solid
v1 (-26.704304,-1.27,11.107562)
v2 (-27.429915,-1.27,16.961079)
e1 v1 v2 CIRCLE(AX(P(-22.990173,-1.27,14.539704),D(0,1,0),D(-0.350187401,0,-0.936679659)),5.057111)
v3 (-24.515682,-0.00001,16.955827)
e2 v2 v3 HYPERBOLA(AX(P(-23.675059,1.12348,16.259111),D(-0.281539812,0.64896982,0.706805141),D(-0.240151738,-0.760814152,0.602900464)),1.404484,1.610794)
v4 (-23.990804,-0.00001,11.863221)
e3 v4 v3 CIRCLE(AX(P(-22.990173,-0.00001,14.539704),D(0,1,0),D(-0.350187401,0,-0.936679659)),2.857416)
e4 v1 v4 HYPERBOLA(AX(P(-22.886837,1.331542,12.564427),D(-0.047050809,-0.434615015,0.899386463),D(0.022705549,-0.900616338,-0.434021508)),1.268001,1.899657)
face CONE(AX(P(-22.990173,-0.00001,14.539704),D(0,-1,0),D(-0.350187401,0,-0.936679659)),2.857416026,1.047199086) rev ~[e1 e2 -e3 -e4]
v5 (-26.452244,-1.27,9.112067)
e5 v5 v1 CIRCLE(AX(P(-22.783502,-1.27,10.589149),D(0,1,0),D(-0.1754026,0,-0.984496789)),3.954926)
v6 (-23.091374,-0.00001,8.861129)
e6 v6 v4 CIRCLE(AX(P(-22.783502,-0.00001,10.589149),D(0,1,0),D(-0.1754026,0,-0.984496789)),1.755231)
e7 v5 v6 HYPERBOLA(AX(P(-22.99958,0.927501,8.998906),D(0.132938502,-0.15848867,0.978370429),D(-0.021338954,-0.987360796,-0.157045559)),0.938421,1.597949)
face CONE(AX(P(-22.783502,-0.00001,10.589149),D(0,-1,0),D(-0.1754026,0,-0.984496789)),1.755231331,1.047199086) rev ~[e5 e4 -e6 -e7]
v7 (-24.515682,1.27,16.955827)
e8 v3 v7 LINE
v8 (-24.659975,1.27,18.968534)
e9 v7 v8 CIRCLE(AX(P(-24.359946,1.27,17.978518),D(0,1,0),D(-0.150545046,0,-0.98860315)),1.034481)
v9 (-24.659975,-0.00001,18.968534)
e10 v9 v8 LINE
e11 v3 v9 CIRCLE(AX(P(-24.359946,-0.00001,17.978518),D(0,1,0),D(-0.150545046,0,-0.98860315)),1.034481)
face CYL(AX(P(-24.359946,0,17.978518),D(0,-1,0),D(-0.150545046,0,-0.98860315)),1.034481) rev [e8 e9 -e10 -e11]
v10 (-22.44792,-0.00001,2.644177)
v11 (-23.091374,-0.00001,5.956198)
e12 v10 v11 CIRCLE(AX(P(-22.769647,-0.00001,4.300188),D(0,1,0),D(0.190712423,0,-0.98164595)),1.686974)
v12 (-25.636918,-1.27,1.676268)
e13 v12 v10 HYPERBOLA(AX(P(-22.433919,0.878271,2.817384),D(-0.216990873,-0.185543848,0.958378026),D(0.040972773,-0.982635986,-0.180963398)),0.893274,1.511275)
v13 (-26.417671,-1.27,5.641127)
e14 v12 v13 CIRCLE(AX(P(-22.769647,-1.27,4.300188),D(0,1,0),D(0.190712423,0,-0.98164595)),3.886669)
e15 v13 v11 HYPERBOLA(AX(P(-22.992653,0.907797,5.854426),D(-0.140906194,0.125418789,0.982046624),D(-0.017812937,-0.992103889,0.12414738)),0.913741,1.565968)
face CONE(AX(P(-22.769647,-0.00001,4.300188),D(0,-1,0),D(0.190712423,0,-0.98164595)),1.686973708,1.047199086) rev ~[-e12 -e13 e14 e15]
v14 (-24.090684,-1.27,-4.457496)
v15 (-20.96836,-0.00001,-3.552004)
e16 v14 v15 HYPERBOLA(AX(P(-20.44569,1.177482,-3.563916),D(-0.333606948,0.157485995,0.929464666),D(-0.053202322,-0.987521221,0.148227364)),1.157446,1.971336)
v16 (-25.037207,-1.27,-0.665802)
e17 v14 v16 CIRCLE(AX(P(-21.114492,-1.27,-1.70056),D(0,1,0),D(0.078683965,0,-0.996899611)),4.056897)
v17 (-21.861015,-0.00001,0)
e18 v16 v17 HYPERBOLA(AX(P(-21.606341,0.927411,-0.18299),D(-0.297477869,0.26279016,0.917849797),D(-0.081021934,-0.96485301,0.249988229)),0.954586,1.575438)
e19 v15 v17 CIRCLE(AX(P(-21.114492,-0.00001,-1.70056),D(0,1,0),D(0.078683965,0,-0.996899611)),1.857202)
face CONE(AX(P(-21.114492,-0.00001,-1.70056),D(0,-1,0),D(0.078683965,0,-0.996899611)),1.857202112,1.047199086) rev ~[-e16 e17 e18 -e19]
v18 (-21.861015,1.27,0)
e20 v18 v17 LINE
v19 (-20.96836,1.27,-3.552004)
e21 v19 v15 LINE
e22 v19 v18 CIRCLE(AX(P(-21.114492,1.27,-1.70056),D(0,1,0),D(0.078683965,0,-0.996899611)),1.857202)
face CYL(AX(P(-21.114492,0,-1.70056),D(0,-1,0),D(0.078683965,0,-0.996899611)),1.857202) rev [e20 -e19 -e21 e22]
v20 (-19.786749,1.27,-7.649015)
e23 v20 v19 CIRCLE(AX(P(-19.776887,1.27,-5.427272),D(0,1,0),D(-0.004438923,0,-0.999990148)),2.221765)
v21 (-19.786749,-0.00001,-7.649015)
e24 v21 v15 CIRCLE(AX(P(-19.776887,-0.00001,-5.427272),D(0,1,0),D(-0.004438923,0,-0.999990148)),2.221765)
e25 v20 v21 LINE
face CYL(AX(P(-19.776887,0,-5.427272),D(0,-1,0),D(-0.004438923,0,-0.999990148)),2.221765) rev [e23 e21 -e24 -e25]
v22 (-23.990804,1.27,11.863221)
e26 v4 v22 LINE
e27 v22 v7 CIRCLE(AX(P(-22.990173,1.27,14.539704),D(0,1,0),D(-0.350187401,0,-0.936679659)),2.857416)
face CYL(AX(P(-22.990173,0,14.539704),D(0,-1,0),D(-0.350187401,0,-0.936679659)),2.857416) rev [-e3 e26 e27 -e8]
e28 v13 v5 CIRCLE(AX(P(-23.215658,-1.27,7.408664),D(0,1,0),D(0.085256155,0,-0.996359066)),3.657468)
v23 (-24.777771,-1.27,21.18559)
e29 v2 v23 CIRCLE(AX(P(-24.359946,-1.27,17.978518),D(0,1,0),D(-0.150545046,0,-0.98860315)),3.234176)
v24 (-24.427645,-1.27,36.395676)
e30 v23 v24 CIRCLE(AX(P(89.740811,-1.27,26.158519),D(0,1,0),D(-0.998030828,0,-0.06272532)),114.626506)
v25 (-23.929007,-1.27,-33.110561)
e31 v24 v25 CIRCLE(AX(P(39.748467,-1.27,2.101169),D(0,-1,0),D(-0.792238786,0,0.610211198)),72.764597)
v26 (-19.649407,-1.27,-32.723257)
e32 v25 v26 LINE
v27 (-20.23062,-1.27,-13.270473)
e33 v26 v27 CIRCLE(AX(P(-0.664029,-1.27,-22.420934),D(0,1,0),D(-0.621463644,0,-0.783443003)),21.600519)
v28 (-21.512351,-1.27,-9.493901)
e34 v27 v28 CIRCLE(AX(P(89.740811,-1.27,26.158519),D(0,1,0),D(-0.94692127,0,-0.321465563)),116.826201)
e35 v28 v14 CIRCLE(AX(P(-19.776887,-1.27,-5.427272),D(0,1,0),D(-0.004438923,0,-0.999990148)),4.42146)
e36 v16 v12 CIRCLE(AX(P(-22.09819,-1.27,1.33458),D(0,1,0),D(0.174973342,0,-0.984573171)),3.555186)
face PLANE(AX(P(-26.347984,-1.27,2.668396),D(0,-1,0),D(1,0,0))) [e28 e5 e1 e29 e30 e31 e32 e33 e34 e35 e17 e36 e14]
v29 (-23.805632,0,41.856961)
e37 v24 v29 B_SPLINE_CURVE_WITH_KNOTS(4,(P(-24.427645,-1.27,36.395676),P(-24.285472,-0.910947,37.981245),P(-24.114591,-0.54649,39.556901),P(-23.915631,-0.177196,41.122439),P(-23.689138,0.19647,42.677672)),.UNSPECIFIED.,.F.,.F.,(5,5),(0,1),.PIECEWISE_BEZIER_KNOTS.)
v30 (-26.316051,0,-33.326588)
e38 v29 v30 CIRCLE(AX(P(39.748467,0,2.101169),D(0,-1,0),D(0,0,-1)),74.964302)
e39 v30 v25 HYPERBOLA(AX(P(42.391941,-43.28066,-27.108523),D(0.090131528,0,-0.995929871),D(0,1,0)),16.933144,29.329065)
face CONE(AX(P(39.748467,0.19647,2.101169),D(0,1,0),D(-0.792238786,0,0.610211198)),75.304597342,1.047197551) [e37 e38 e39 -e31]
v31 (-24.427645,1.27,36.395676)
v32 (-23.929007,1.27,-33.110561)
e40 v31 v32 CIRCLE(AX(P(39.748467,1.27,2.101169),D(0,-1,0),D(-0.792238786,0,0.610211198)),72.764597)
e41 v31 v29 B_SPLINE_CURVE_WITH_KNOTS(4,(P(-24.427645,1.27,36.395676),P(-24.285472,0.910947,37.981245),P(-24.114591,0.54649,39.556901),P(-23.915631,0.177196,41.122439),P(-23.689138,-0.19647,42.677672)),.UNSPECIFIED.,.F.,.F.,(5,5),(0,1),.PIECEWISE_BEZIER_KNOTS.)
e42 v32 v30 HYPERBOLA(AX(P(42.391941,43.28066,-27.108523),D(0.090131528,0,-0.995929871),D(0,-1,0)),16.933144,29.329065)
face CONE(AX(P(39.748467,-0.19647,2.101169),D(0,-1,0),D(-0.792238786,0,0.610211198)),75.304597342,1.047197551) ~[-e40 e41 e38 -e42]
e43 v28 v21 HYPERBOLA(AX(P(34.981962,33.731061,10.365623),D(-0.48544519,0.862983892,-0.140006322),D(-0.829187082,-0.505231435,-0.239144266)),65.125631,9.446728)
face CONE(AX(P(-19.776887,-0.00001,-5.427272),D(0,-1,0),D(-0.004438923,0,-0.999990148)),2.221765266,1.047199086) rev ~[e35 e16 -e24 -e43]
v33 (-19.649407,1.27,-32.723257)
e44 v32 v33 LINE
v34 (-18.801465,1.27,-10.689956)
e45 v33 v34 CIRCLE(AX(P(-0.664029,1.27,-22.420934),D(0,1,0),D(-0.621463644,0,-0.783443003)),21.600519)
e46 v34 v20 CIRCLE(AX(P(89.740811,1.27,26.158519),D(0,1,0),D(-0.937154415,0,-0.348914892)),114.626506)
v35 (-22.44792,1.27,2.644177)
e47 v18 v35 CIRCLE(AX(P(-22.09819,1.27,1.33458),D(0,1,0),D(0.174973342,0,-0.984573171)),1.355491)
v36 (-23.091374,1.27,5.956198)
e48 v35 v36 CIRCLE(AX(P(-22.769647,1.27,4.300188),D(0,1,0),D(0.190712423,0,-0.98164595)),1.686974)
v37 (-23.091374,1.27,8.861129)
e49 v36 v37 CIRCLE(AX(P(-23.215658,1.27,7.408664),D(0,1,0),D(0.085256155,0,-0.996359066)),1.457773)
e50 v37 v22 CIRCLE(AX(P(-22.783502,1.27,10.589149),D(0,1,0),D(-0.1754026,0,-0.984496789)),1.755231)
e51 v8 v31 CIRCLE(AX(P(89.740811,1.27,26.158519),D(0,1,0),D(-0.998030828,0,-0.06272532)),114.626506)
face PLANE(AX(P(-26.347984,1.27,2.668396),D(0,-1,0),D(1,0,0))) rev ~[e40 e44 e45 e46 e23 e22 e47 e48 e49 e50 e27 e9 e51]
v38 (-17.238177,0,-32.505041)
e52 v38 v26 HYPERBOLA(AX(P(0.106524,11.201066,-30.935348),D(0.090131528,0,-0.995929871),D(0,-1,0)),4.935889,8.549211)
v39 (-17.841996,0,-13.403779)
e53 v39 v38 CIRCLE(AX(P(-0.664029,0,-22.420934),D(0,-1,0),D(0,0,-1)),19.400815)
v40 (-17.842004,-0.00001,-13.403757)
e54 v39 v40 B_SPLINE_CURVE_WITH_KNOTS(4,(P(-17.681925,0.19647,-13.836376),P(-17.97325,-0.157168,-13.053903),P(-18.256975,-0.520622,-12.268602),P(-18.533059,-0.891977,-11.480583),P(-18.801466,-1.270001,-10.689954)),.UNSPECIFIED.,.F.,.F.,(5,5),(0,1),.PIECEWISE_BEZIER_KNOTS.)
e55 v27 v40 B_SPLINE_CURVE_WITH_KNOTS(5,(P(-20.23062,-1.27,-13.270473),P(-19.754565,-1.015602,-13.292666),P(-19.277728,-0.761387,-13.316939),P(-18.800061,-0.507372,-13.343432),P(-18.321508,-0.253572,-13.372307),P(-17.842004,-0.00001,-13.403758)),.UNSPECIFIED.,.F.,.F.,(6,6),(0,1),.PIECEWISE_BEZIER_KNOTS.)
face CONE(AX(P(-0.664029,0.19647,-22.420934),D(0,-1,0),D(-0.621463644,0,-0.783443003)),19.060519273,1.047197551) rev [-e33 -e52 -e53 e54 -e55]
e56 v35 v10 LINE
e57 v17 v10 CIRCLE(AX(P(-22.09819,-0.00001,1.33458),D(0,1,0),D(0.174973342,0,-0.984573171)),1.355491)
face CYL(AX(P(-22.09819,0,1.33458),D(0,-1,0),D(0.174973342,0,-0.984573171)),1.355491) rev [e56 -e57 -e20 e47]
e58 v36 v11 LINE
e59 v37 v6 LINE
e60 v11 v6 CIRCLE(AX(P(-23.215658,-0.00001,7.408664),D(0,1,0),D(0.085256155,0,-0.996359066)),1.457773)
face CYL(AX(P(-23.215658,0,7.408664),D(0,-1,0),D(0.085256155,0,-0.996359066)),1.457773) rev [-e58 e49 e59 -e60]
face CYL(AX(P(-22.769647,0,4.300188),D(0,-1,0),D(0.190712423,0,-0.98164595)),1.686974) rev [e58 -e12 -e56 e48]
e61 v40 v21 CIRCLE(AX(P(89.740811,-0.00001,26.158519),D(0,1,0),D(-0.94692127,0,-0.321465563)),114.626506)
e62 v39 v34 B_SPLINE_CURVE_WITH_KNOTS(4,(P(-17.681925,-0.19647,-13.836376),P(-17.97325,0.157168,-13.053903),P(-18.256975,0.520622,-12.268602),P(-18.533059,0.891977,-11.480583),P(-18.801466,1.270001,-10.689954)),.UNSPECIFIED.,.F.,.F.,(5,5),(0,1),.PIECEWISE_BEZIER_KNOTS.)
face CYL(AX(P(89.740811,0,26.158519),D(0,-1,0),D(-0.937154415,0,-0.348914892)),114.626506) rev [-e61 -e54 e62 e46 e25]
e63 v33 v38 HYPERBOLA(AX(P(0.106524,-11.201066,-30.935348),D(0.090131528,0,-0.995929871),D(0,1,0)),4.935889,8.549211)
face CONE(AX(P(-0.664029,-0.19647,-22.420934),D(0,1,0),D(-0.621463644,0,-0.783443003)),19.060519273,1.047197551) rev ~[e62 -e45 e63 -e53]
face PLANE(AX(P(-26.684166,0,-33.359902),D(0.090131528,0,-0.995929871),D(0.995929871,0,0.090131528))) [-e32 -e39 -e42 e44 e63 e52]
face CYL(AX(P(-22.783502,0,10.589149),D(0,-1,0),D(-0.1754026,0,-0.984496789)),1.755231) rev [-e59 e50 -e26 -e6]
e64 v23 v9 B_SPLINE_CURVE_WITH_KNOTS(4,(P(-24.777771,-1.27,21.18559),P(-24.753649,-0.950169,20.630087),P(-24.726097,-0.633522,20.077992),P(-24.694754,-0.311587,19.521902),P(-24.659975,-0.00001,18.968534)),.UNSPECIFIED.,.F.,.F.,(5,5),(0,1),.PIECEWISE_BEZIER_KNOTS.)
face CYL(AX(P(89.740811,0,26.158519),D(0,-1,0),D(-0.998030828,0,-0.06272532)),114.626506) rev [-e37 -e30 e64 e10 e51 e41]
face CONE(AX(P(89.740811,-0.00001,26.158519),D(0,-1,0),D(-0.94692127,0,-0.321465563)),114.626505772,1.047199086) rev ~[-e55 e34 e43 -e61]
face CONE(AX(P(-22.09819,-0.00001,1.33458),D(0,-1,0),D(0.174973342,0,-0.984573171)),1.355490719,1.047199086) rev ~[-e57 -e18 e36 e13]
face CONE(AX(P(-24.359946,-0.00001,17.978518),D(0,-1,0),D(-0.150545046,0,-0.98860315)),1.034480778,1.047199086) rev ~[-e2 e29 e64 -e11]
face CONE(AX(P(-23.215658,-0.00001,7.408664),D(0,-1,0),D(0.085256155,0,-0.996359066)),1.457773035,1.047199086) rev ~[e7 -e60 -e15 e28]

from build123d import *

# Parameters (mm, degrees)
F1_DEPTH    = 1.27
F2_T2_ANGLE = 70.6982594797
F2_T4_ANGLE = 98.1015766654
F2_T6_ANGLE = 98.1015766654
F2_T8_ANGLE = 70.6982594797
F3_SIZE2    = 1.26999
F3_SIZE     = 2.199695


# Not quite as in the source:
# - a fillet or chamfer that OpenCascade refuses, or shapes differently, is made with other operations: its cross-section is extruded or revolved along the edge and cut away or added
# - a fillet or chamfer is up to 0.001 mm smaller than in the source, because OpenCascade refuses the exact size


with BuildPart() as f1:
    # F0 (on Front) → F1 (new body, symmetric)
    with BuildSketch(Plane.XZ):
        with BuildLine():
            ThreePointArc((-24.6599751414, 18.9685343092), (-24.7897166458, 30.8482925644), (-23.6891379404, 42.6776719046))
            ThreePointArc((-23.6891379404, 42.6776719046), (-35.4977812157, 5.0650277845), (-26.6841664691, -33.3599022584))
            Line((-26.6841664691, -33.3599022584), (-16.8598182499, -32.4707999825))
            ThreePointArc((-16.8598182499, -32.4707999825), (-19.7060260634, -23.2610213965), (-17.6819246262, -13.836376369))
            ThreePointArc((-17.6819246262, -13.836376369), (-18.7784432725, -10.7577001108), (-19.7867489636, -7.6490154569))
            ThreePointArc((-19.7867489636, -7.6490154569), (-21.9116415788, -6.0429526618), (-20.9683603212, -3.5520036866))
            ThreePointArc((-20.9683603212, -3.5520036866), (-22.9156863653, -2.1532182096), (-21.8610153861, 0))
            ThreePointArc((-21.8610153861, 0), (-23.4214756824, 1.0408615122), (-22.4479204638, 2.6441765967))
            ThreePointArc((-22.4479204638, 2.6441765967), (-24.4256582154, 3.9784606628), (-23.0913741493, 5.9561984144))
            ThreePointArc((-23.0913741493, 5.9561984144), (-24.6734313076, 7.4086637933), (-23.0913741493, 8.8611291721))
            ThreePointArc((-23.0913741493, 8.8611291721), (-24.4648932463, 10.085402282), (-23.9908037994, 11.8632207636))
            ThreePointArc((-23.9908037994, 11.8632207636), (-25.8325317785, 14.2467515683), (-24.515682055, 16.9558266598))
            ThreePointArc((-24.515682055, 16.9558266598), (-25.3917786695, 17.9045444751), (-24.6599751414, 18.9685343092))
        make_face()
    extrude(amount=F1_DEPTH, both=True)

    # F2: chamfer of 2.54 x 1.4664696837 on 4 edges, made by hand

    # F2_s1 → F2_t2 (revolve, cut)
    with BuildSketch(Plane(origin=(15.8164222993, 0, 20.5345022431), x_dir=(0, 1, 0), z_dir=(0.6102111975, 0, 0.7922387862))):
        Polygon((0.1964696837, 45.0964764528), (-1.27, 42.5564764528), (-1.27, 45.0964764528), align=None)
    revolve(axis=Axis((39.7484673267, -1.27, 2.1011686196), (0, -1, 0)), revolution_arc=F2_T2_ANGLE, mode=Mode.SUBTRACT)

    # F2_s3 → F2_t4 (revolve, cut)
    with BuildSketch(Plane(origin=(10.5087646573, 0, -8.3360437766), x_dir=(0, 1, 0), z_dir=(0.7834430035, 0, -0.6214636436))):
        Polygon((0.1964696837, -37.0387129854), (-1.27, -39.5787129854), (-1.27, -37.0387129854), align=None)
    revolve(axis=Axis((-0.664029112, -1.27, -22.4209338555), (0, 1, 0)), revolution_arc=F2_T4_ANGLE, mode=Mode.SUBTRACT)

    # F2_s5 → F2_t6 (revolve, cut)
    with BuildSketch(Plane(origin=(10.5087646573, 0, -8.3360437766), x_dir=(0, 1, 0), z_dir=(0.7834430035, 0, -0.6214636436))):
        Polygon((-0.1964696837, -37.0387129854), (1.27, -39.5787129854), (1.27, -37.0387129854), align=None)
    revolve(axis=Axis((-0.664029112, 1.27, -22.4209338555), (0, 1, 0)), revolution_arc=F2_T6_ANGLE, mode=Mode.SUBTRACT)

    # F2_s7 → F2_t8 (revolve, cut)
    with BuildSketch(Plane(origin=(15.8164222993, 0, 20.5345022431), x_dir=(0, 1, 0), z_dir=(0.6102111975, 0, 0.7922387862))):
        Polygon((-0.1964696837, 45.0964764528), (1.27, 42.5564764528), (1.27, 45.0964764528), align=None)
    revolve(axis=Axis((39.7484673267, 1.27, 2.1011686196), (0, -1, 0)), revolution_arc=F2_T8_ANGLE, mode=Mode.SUBTRACT)

    # F3 (size 2.1997045256 and 1.27 in the source; OpenCascade refuses exactly that, so slightly less here)
    f3_edges = [f1.edges().sort_by_distance(p)[0] for p in [
        (-25.391779, -1.27, 17.904544),
        (-25.832532, -1.27, 14.246752),
        (-24.464893, -1.27, 10.085402),
        (-24.673431, -1.27, 7.408664),
        (-24.425658, -1.27, 3.978461),
        (-23.421476, -1.27, 1.040862),
        (-22.915686, -1.27, -2.153218),
        (-21.911642, -1.27, -6.042953),
        (-19.304708, -1.27, -9.17292),
    ]]
    f3_side = f1.faces().sort_by_distance((-26.820245, -1.27, -2.285194))[0]
    chamfer(f3_edges, length=F3_SIZE, length2=F3_SIZE2, reference=f3_side)


solid = f1.part
